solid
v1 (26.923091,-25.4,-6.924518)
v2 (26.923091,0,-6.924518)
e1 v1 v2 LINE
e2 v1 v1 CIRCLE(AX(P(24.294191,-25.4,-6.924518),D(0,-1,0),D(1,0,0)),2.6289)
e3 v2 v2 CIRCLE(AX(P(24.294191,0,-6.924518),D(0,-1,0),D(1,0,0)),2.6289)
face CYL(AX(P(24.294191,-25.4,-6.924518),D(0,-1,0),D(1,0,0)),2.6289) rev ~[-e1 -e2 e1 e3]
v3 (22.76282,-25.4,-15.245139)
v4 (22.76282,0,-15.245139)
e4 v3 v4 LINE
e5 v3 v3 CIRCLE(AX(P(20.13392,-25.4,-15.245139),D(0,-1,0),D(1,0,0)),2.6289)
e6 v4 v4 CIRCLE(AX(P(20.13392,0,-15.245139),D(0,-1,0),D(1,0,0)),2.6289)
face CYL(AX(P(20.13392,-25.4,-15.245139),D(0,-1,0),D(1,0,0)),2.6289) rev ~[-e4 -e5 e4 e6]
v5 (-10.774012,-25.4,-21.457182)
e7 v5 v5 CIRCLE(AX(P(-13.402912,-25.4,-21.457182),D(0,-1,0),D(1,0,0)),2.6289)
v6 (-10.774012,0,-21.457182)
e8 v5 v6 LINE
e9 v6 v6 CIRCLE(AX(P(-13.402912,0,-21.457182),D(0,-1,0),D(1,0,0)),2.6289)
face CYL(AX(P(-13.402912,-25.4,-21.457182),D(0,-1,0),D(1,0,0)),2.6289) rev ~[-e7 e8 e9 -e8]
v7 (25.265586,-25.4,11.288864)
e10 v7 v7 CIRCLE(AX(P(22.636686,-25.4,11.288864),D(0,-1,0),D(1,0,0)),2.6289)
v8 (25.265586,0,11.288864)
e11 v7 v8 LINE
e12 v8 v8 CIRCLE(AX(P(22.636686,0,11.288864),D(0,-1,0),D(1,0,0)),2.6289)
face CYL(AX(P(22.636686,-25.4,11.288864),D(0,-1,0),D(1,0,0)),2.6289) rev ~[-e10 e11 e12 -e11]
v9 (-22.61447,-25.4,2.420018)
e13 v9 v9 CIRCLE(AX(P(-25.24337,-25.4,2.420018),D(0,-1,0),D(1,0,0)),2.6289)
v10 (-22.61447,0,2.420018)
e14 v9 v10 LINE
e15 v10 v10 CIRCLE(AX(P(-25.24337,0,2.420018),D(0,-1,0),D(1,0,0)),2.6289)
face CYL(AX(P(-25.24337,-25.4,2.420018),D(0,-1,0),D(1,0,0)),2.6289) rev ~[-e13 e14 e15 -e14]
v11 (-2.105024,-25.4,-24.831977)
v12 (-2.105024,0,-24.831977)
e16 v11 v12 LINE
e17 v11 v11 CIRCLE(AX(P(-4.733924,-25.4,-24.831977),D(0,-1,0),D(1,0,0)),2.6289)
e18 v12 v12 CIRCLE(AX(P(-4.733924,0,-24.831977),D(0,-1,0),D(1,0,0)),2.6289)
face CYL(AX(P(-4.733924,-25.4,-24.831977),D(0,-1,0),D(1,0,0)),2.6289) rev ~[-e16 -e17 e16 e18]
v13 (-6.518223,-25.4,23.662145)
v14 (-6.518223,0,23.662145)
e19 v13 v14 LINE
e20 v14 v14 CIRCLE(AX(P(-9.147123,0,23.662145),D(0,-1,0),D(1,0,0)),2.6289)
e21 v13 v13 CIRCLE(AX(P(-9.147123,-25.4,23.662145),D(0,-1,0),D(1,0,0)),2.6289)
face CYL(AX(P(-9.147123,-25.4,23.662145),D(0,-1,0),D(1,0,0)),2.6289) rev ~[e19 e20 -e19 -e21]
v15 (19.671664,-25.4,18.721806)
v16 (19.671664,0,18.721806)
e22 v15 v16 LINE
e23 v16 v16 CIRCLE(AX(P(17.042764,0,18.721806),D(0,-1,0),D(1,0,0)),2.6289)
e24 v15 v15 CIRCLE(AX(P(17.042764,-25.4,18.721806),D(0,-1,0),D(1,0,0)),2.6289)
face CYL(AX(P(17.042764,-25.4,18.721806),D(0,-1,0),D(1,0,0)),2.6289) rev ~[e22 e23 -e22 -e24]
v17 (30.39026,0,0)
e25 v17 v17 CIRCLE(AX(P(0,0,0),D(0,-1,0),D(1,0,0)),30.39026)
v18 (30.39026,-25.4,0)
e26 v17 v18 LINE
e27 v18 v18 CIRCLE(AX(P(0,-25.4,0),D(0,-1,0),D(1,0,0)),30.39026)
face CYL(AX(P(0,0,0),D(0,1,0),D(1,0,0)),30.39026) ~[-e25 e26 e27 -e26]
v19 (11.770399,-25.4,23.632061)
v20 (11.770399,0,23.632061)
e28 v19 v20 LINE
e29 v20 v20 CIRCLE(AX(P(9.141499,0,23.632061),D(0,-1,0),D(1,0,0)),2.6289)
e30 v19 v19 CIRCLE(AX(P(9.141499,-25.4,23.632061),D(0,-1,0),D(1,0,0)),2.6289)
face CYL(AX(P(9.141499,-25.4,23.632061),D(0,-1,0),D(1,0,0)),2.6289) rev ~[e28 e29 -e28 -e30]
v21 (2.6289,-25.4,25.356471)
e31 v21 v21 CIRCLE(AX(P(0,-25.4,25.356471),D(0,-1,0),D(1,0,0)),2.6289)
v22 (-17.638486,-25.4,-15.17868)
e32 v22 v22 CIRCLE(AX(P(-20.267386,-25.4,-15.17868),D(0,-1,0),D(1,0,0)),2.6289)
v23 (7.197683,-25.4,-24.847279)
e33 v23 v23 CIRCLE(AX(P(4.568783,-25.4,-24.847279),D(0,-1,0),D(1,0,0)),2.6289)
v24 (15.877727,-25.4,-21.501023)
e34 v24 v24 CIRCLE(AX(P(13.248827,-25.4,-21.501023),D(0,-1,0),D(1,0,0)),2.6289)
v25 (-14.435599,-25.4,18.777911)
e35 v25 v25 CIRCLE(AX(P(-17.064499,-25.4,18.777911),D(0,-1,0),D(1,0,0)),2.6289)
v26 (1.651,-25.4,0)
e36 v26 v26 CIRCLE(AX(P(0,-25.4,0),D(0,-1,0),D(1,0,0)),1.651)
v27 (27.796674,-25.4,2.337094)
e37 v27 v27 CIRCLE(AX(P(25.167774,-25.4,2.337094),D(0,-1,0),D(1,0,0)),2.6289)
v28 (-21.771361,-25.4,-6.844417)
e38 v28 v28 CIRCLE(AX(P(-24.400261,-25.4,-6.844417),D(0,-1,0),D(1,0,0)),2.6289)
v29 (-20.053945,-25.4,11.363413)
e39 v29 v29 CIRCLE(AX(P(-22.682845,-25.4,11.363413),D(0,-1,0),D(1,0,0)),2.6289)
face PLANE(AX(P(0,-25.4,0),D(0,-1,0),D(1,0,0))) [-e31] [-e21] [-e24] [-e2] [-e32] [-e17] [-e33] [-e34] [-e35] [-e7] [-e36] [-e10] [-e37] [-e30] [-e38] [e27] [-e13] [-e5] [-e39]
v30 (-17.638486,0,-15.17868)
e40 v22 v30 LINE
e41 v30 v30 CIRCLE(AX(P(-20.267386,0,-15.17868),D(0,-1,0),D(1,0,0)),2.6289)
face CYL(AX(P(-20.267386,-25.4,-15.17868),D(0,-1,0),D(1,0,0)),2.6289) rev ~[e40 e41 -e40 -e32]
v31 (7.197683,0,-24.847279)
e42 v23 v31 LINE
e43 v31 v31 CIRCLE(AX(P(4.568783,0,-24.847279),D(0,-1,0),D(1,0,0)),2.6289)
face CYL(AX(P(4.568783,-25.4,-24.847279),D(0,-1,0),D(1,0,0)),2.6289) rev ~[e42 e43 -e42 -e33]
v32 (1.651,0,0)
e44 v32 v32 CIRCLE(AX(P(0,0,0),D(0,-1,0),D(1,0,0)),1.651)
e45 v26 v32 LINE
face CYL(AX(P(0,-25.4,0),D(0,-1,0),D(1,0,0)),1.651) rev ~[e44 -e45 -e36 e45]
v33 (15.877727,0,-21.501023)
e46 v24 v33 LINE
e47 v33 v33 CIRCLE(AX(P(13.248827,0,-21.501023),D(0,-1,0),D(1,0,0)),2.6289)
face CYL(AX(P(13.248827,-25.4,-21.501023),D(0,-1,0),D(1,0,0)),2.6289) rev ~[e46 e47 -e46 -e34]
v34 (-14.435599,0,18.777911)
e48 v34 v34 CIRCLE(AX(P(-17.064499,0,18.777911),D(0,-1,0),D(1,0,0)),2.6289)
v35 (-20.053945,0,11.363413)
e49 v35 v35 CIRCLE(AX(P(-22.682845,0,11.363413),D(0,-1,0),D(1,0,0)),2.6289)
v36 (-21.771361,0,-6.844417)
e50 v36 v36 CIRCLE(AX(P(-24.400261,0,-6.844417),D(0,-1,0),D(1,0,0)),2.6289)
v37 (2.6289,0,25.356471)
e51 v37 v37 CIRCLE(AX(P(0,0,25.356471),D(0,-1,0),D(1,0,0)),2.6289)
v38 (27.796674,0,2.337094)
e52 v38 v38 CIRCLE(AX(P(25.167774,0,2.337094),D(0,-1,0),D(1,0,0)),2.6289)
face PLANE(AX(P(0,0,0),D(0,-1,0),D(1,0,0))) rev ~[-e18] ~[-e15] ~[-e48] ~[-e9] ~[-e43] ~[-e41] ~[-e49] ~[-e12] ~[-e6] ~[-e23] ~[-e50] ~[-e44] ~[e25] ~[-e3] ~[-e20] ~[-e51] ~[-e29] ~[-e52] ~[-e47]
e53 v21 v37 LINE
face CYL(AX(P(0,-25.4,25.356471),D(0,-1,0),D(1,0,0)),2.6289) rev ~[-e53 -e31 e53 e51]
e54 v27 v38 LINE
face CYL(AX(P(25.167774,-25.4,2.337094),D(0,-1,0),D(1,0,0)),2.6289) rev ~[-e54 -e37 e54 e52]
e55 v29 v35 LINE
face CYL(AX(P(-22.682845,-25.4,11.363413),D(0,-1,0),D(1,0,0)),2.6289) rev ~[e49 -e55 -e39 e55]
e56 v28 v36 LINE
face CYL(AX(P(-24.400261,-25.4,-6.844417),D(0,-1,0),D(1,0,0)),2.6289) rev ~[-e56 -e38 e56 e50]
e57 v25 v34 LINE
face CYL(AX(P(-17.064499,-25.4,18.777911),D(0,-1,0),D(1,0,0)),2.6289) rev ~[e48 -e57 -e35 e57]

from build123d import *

# Parameters (mm, degrees)
F0_R     = 30.3902596551
F1_DEPTH = 25.4
F2_R     = 2.6289
F3_DEPTH = 35.306
F4_R     = 1.651
F5_DEPTH = 25.4


# Not quite as in the source:
# - a feature names something its author has since deleted; it is built from what else it names


with BuildPart() as f1:
    # F0 (on Front) → F1 (new body)
    with BuildSketch(Plane.XZ):
        Circle(F0_R)
    extrude(amount=F1_DEPTH)

    # F2 (on face) → F3 (cut)
    with BuildSketch(Plane.XZ.offset(25.4)):
        with Locations((-9.1471226763, 23.6621449357)):
            Circle(F2_R)
        with Locations((0, 25.3564708744)):
            Circle(F2_R)
        with Locations((-20.2673863665, -15.1786801491)):
            Circle(F2_R)
        with Locations((-24.4002614445, -6.8444173004)):
            Circle(F2_R)
        with Locations((-25.2433696844, 2.4200180379)):
            Circle(F2_R)
        with Locations((-22.6828446466, 11.3634125374)):
            Circle(F2_R)
        with Locations((-17.0644994257, 18.7779112138)):
            Circle(F2_R)
        with Locations((-4.7339240202, -24.8319767568)):
            Circle(F2_R)
        with Locations((-13.4029121308, -21.4571821289)):
            Circle(F2_R)
        with Locations((4.5687830844, -24.847279318)):
            Circle(F2_R)
        with Locations((9.1414989998, 23.6320609235)):
            Circle(F2_R)
        with Locations((17.0427642284, 18.721806202)):
            Circle(F2_R)
        with Locations((22.6366860342, 11.2888638188)):
            Circle(F2_R)
        with Locations((25.1677742804, 2.33709383)):
            Circle(F2_R)
        with Locations((24.294191474, -6.9245176239)):
            Circle(F2_R)
        with Locations((20.1339198139, -15.2451385957)):
            Circle(F2_R)
        with Locations((13.2488270404, -21.5010231169)):
            Circle(F2_R)
    extrude(amount=-F3_DEPTH, mode=Mode.SUBTRACT)

    # F4 (on face) → F5 (cut)
    with BuildSketch(Plane.XZ.offset(25.4)):
        Circle(F4_R)
    extrude(amount=-F5_DEPTH, mode=Mode.SUBTRACT)


solid = f1.part
